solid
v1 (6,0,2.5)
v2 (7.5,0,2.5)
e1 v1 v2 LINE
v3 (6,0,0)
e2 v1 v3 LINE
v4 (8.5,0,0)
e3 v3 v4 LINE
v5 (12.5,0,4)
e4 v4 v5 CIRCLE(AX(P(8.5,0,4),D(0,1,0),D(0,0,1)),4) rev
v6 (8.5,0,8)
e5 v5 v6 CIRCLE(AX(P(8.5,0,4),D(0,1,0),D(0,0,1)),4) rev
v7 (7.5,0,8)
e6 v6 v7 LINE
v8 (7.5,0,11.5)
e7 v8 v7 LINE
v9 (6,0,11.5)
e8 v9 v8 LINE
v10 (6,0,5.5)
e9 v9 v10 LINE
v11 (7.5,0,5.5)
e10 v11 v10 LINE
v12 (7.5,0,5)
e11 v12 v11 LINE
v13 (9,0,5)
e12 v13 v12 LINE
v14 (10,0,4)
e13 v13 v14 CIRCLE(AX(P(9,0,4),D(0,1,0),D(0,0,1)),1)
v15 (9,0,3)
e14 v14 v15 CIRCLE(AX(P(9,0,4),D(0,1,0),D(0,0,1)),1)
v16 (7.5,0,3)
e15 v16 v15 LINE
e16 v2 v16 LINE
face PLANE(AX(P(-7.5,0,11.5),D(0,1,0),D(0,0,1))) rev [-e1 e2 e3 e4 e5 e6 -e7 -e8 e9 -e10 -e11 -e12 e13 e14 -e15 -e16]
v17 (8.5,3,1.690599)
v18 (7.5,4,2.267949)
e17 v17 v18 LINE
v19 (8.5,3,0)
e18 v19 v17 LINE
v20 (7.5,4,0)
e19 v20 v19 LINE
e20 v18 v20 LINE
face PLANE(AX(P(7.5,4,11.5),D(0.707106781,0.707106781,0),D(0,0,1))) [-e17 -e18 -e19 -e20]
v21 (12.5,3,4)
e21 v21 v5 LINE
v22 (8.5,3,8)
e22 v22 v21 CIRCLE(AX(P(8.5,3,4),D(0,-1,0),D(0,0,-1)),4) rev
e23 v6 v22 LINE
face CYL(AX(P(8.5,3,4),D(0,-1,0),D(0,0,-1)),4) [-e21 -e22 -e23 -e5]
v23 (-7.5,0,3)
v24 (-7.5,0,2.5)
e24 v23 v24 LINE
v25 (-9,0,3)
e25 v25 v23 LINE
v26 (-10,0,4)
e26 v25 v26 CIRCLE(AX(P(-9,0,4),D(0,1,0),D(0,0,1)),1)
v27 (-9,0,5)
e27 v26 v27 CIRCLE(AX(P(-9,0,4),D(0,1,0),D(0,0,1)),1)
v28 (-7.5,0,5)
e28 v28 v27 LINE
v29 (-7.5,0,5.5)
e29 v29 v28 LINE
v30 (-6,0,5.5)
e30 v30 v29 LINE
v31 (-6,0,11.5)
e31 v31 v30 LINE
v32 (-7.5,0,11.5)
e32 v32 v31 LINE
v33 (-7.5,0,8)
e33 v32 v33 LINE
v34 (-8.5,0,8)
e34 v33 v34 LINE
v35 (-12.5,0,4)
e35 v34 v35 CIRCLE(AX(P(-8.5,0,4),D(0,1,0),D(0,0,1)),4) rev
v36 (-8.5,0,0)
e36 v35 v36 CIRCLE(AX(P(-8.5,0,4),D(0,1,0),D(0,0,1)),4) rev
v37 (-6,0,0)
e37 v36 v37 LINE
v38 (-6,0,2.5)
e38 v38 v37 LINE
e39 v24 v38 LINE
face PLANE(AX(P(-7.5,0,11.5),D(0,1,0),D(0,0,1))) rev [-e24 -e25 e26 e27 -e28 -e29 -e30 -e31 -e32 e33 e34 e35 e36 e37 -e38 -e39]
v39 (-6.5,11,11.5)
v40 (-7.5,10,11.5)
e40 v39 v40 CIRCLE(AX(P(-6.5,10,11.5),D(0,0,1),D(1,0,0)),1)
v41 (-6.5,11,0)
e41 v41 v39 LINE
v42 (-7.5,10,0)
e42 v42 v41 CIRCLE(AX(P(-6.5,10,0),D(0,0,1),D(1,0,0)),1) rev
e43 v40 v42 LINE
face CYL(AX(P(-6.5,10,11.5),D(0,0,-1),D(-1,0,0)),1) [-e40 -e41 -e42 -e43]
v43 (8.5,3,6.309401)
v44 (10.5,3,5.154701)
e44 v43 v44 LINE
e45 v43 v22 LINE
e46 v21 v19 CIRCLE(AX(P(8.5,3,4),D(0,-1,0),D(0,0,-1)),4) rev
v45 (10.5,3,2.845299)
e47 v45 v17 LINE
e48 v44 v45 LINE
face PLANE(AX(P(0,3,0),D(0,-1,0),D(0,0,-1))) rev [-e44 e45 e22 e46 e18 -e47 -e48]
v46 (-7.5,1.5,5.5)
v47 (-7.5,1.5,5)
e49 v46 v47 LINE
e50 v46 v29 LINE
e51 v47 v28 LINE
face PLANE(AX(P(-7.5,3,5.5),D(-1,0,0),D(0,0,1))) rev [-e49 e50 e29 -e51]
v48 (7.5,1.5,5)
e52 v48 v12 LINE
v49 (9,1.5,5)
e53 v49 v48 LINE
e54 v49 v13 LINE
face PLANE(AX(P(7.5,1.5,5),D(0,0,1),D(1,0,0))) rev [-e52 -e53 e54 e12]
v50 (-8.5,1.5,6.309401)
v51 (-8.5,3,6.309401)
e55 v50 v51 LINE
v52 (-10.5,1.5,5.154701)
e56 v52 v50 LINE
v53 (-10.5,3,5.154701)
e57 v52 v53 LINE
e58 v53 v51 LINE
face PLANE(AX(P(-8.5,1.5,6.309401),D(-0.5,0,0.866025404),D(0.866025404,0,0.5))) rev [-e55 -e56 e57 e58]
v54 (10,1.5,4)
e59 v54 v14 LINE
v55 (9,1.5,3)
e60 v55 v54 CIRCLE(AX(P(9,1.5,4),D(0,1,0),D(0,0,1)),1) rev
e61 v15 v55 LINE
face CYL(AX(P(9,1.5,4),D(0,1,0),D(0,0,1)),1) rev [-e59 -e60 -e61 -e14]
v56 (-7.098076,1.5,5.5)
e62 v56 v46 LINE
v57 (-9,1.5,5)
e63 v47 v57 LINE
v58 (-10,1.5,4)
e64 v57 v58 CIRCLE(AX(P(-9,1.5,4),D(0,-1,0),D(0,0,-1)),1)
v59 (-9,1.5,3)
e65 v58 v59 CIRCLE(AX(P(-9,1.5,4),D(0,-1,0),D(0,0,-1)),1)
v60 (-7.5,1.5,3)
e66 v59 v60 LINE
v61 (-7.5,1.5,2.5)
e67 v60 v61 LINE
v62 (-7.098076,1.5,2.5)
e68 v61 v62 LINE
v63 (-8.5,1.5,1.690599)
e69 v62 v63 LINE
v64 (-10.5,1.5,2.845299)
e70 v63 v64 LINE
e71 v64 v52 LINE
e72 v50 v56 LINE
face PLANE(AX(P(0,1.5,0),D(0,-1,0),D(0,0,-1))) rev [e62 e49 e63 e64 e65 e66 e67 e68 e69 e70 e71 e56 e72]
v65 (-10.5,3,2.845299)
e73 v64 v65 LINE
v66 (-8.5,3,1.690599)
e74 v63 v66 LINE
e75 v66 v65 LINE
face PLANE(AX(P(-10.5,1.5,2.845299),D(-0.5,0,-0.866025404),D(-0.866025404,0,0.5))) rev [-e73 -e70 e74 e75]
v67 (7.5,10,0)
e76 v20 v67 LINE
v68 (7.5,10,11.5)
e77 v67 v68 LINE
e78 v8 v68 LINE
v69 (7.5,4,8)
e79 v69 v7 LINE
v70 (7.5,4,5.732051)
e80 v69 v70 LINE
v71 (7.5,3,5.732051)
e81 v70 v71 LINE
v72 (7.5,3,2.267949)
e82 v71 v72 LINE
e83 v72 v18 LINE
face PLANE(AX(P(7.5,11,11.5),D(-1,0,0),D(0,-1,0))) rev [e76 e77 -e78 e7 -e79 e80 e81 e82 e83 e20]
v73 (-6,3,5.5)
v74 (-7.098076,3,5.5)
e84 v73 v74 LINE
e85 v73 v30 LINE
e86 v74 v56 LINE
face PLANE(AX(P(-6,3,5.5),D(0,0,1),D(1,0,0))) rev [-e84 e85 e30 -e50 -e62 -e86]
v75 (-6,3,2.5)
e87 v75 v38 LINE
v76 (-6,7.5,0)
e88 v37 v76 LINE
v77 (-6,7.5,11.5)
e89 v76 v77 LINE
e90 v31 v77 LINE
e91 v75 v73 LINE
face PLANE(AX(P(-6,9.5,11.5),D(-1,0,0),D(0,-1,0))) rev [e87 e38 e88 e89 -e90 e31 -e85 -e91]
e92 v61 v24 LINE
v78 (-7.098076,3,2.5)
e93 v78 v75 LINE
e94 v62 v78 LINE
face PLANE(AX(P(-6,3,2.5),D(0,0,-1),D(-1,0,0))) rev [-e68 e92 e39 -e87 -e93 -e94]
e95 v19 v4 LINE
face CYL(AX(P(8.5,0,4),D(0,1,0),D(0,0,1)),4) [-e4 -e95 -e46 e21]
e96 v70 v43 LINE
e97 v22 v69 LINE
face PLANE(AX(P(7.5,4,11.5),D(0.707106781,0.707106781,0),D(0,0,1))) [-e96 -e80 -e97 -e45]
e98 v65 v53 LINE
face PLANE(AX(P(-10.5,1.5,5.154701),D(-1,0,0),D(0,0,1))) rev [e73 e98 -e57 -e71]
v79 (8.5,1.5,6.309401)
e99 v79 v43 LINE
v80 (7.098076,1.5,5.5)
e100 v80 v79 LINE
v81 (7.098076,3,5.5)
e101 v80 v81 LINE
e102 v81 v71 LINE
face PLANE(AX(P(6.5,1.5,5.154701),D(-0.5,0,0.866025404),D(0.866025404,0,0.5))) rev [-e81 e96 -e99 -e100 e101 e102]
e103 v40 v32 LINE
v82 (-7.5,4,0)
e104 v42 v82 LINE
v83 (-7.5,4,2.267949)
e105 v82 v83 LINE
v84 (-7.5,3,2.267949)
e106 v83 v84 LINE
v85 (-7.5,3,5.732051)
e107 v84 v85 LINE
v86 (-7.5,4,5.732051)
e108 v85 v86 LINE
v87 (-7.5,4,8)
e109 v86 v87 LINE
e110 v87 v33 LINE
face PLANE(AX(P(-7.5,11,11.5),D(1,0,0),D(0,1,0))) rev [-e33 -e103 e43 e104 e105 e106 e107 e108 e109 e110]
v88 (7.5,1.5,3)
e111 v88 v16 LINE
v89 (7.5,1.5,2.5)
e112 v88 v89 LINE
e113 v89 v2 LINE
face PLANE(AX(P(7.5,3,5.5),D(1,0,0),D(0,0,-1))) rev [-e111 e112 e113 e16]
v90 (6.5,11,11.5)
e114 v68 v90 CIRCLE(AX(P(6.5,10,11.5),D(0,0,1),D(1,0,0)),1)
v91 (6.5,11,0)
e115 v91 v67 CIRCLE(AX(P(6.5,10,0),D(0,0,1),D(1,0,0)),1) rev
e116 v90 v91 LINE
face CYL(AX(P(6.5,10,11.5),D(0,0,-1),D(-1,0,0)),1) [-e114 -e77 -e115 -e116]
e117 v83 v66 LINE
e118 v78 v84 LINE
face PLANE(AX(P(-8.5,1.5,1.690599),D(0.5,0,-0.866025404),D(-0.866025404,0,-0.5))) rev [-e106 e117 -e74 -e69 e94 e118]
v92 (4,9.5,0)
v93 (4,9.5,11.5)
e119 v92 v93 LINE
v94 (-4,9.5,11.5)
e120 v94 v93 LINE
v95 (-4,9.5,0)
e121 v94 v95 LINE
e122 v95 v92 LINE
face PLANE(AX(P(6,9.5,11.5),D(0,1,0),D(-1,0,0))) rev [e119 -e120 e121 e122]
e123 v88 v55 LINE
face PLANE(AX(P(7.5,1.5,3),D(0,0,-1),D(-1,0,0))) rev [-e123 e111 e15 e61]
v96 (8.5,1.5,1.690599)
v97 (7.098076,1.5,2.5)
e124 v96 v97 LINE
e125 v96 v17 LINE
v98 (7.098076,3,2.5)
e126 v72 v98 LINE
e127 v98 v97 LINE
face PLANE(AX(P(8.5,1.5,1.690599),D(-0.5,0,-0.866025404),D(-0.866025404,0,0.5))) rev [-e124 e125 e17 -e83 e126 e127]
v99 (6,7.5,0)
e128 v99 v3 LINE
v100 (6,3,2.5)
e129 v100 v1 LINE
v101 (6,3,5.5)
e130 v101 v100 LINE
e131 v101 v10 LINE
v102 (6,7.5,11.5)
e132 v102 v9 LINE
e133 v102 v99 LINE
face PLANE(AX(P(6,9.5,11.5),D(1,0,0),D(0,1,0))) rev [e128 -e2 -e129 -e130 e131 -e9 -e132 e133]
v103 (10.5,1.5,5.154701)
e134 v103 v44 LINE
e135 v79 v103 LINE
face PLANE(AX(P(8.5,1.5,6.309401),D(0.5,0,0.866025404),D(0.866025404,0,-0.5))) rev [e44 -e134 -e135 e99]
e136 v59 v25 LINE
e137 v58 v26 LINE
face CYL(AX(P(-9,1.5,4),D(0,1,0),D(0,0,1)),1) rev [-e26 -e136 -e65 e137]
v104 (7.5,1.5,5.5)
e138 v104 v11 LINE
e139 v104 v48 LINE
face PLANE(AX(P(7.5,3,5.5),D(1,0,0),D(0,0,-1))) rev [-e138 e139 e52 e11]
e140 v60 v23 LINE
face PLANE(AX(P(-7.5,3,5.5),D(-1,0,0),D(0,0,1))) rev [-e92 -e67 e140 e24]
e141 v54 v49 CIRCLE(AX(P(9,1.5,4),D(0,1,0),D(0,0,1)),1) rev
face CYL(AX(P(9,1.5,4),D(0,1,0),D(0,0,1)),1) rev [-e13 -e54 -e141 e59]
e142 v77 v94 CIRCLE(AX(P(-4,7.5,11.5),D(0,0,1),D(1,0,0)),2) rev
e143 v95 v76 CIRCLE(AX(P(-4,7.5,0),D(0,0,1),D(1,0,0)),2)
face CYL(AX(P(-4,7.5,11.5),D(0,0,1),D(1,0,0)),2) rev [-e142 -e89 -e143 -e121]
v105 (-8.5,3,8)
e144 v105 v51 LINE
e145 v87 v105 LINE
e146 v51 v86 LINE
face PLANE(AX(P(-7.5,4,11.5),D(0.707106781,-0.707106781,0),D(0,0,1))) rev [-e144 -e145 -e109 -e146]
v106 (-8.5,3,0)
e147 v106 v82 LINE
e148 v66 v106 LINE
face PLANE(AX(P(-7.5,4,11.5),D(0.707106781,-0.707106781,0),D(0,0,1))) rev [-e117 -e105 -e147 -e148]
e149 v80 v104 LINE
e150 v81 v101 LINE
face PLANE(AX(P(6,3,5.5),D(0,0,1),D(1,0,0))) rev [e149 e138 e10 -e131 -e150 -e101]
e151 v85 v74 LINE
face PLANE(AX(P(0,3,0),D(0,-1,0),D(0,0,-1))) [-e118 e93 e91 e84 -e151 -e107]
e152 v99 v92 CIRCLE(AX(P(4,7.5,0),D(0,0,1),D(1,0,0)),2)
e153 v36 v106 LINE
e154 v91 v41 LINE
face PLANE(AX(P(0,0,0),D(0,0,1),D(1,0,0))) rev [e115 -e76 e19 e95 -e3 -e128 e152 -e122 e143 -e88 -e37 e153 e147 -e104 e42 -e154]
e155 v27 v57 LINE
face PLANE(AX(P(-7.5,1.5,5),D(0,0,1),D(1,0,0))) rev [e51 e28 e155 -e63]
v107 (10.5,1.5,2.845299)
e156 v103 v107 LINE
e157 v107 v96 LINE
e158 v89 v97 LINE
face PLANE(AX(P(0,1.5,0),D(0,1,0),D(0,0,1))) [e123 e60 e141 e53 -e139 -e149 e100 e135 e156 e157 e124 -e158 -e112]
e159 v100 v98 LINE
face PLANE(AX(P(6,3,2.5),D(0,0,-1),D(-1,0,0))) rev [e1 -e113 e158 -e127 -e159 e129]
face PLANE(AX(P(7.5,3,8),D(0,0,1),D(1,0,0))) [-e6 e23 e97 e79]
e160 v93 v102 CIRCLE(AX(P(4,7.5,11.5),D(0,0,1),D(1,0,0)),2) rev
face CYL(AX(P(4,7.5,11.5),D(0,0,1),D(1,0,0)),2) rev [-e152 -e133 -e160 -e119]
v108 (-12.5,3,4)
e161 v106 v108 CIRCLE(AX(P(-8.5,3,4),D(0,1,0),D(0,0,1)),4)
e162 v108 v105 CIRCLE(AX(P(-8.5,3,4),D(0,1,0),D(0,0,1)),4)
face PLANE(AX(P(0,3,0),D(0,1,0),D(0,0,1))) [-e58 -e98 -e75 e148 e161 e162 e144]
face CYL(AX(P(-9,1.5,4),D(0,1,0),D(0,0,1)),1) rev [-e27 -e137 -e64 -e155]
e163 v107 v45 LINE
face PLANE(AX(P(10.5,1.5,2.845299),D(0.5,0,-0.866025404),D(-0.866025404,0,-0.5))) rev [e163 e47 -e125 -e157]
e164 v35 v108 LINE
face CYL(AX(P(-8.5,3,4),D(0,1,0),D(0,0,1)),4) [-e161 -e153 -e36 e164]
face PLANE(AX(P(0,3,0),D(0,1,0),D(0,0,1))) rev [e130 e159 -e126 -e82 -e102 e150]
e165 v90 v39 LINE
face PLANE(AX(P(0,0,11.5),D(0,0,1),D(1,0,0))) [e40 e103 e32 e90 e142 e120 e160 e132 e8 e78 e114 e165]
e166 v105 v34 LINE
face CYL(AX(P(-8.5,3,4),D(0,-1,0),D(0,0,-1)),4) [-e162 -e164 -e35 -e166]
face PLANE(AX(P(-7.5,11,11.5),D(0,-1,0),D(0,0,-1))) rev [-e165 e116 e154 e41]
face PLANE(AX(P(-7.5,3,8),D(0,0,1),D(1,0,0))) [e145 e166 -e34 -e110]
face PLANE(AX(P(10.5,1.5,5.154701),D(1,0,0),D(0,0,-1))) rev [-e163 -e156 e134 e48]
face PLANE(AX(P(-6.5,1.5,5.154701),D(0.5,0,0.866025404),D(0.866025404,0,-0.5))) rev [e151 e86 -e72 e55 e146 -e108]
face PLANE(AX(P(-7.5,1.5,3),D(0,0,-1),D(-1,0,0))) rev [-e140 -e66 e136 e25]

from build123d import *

# Parameters (mm, degrees)
SKETCH_1_W          = 15
SKETCH_1_H          = 11
EXTRUDE_1_DEPTH     = 11.5
SKETCH_2_W          = 5
SKETCH_2_H          = 8
EXTRUDE_2_DEPTH     = 3
SKETCH_3_W          = 12
SKETCH_3_H          = 9.5
CUT_EXTRUDE_1_DEPTH = 21.236106345
CUT_EXTRUDE_2_DEPTH = 1.5
SKETCH_5_W          = 1.5
SKETCH_5_H          = 3
CUT_EXTRUDE_3_DEPTH = 3
SKETCH_6_W          = 2.5
SKETCH_6_H          = 2
CUT_EXTRUDE_4_DEPTH = 1.5
FILLET_1_R          = 2
FILLET_2_R          = 4
FILLET_3_R          = 1
CHAMFER_1_SIZE      = 1
FILLET_4_R          = 1


with BuildPart() as part:
    # 草图1 → 凸台-拉伸1 (new body)
    with BuildSketch(Plane.XY):
        with Locations((0, 5.5)):
            Rectangle(SKETCH_1_W, SKETCH_1_H)
    extrude(amount=EXTRUDE_1_DEPTH)

    # 草图2 → 凸台-拉伸2 (add)
    with BuildSketch(Plane.XZ):
        with Locations((-10, 4)):
            Rectangle(SKETCH_2_W, SKETCH_2_H)
        with Locations((10, 4)):
            Rectangle(SKETCH_2_W, SKETCH_2_H)
    extrude(amount=-EXTRUDE_2_DEPTH)

    # 草图3 → 切除-拉伸1 (cut, through all)
    with BuildSketch(Plane(origin=(0, 0, 0), x_dir=(-1, 0, 0), z_dir=(0, 0, -1))):
        with Locations((0, 4.75)):
            Rectangle(SKETCH_3_W, SKETCH_3_H)
    extrude(amount=-CUT_EXTRUDE_1_DEPTH, mode=Mode.SUBTRACT)

    # 草图4 → 切除-拉伸2 (cut)
    with BuildSketch(Plane(origin=(0, 3, 0), x_dir=(1, 0, 0), z_dir=(0, 1, 0))):
        Polygon((8.5, -1.690598923), (6.5, -2.845299462), (6.5, -5.154700538), (8.5, -6.309401077), (10.5, -5.154700538), (10.5, -2.845299462), align=None)
        Polygon((-10.5, -2.845299462), (-8.5, -1.690598923), (-6.5, -2.845299462), (-6.5, -5.154700538), (-8.5, -6.309401077), (-10.5, -5.154700538), align=None)
    extrude(amount=-CUT_EXTRUDE_2_DEPTH, mode=Mode.SUBTRACT)

    # 草图5 → 切除-拉伸3 (cut)
    with BuildSketch(Plane.XZ):
        with Locations((6.75, 4)):
            Rectangle(SKETCH_5_W, SKETCH_5_H)
        with Locations((-6.75, 4)):
            Rectangle(SKETCH_5_W, SKETCH_5_H)
    extrude(amount=-CUT_EXTRUDE_3_DEPTH, mode=Mode.SUBTRACT)

    # 草图6 → 切除-拉伸4 (cut)
    with BuildSketch(Plane.XZ):
        with Locations((8.75, 4)):
            Rectangle(SKETCH_6_W, SKETCH_6_H)
        with Locations((-8.75, 4)):
            Rectangle(SKETCH_6_W, SKETCH_6_H)
    extrude(amount=-CUT_EXTRUDE_4_DEPTH, mode=Mode.SUBTRACT)

    # 圆角1
    fillet_1_edges = [part.edges().sort_by_distance(p)[0] for p in [
        (6, 9.5, 5.75),
        (-6, 9.5, 5.75),
    ]]
    fillet(fillet_1_edges, radius=FILLET_1_R)

    # 圆角2
    fillet_2_edges = [part.edges().sort_by_distance(p)[0] for p in [
        (12.5, 1.5, 0),
        (12.5, 1.5, 8),
        (-12.5, 1.5, 0),
        (-12.5, 1.5, 8),
    ]]
    fillet(fillet_2_edges, radius=FILLET_2_R - 0.0001)  # a hair under: the kernel refuses the full size

    # 圆角3
    fillet_3_edges = [part.edges().sort_by_distance(p)[0] for p in [
        (10, 0.75, 5),
        (10, 0.75, 3),
        (-10, 0.75, 3),
        (-10, 0.75, 5),
    ]]
    fillet(fillet_3_edges, radius=FILLET_3_R - 0.0001)  # a hair under: the kernel refuses the full size

    # 倒角1
    chamfer_1_edges = [part.edges().sort_by_distance(p)[0] for p in [
        (7.5, 3, 6.866025404),
        (7.5, 3, 1.133974596),
        (-7.5, 3, 6.866025404),
        (-7.5, 3, 1.133974596),
    ]]
    chamfer(chamfer_1_edges, length=CHAMFER_1_SIZE)

    # 圆角4
    fillet_4_edges = [part.edges().sort_by_distance(p)[0] for p in [
        (-7.5, 11, 5.75),
        (7.5, 11, 5.75),
    ]]
    fillet(fillet_4_edges, radius=FILLET_4_R)


solid = part.part
